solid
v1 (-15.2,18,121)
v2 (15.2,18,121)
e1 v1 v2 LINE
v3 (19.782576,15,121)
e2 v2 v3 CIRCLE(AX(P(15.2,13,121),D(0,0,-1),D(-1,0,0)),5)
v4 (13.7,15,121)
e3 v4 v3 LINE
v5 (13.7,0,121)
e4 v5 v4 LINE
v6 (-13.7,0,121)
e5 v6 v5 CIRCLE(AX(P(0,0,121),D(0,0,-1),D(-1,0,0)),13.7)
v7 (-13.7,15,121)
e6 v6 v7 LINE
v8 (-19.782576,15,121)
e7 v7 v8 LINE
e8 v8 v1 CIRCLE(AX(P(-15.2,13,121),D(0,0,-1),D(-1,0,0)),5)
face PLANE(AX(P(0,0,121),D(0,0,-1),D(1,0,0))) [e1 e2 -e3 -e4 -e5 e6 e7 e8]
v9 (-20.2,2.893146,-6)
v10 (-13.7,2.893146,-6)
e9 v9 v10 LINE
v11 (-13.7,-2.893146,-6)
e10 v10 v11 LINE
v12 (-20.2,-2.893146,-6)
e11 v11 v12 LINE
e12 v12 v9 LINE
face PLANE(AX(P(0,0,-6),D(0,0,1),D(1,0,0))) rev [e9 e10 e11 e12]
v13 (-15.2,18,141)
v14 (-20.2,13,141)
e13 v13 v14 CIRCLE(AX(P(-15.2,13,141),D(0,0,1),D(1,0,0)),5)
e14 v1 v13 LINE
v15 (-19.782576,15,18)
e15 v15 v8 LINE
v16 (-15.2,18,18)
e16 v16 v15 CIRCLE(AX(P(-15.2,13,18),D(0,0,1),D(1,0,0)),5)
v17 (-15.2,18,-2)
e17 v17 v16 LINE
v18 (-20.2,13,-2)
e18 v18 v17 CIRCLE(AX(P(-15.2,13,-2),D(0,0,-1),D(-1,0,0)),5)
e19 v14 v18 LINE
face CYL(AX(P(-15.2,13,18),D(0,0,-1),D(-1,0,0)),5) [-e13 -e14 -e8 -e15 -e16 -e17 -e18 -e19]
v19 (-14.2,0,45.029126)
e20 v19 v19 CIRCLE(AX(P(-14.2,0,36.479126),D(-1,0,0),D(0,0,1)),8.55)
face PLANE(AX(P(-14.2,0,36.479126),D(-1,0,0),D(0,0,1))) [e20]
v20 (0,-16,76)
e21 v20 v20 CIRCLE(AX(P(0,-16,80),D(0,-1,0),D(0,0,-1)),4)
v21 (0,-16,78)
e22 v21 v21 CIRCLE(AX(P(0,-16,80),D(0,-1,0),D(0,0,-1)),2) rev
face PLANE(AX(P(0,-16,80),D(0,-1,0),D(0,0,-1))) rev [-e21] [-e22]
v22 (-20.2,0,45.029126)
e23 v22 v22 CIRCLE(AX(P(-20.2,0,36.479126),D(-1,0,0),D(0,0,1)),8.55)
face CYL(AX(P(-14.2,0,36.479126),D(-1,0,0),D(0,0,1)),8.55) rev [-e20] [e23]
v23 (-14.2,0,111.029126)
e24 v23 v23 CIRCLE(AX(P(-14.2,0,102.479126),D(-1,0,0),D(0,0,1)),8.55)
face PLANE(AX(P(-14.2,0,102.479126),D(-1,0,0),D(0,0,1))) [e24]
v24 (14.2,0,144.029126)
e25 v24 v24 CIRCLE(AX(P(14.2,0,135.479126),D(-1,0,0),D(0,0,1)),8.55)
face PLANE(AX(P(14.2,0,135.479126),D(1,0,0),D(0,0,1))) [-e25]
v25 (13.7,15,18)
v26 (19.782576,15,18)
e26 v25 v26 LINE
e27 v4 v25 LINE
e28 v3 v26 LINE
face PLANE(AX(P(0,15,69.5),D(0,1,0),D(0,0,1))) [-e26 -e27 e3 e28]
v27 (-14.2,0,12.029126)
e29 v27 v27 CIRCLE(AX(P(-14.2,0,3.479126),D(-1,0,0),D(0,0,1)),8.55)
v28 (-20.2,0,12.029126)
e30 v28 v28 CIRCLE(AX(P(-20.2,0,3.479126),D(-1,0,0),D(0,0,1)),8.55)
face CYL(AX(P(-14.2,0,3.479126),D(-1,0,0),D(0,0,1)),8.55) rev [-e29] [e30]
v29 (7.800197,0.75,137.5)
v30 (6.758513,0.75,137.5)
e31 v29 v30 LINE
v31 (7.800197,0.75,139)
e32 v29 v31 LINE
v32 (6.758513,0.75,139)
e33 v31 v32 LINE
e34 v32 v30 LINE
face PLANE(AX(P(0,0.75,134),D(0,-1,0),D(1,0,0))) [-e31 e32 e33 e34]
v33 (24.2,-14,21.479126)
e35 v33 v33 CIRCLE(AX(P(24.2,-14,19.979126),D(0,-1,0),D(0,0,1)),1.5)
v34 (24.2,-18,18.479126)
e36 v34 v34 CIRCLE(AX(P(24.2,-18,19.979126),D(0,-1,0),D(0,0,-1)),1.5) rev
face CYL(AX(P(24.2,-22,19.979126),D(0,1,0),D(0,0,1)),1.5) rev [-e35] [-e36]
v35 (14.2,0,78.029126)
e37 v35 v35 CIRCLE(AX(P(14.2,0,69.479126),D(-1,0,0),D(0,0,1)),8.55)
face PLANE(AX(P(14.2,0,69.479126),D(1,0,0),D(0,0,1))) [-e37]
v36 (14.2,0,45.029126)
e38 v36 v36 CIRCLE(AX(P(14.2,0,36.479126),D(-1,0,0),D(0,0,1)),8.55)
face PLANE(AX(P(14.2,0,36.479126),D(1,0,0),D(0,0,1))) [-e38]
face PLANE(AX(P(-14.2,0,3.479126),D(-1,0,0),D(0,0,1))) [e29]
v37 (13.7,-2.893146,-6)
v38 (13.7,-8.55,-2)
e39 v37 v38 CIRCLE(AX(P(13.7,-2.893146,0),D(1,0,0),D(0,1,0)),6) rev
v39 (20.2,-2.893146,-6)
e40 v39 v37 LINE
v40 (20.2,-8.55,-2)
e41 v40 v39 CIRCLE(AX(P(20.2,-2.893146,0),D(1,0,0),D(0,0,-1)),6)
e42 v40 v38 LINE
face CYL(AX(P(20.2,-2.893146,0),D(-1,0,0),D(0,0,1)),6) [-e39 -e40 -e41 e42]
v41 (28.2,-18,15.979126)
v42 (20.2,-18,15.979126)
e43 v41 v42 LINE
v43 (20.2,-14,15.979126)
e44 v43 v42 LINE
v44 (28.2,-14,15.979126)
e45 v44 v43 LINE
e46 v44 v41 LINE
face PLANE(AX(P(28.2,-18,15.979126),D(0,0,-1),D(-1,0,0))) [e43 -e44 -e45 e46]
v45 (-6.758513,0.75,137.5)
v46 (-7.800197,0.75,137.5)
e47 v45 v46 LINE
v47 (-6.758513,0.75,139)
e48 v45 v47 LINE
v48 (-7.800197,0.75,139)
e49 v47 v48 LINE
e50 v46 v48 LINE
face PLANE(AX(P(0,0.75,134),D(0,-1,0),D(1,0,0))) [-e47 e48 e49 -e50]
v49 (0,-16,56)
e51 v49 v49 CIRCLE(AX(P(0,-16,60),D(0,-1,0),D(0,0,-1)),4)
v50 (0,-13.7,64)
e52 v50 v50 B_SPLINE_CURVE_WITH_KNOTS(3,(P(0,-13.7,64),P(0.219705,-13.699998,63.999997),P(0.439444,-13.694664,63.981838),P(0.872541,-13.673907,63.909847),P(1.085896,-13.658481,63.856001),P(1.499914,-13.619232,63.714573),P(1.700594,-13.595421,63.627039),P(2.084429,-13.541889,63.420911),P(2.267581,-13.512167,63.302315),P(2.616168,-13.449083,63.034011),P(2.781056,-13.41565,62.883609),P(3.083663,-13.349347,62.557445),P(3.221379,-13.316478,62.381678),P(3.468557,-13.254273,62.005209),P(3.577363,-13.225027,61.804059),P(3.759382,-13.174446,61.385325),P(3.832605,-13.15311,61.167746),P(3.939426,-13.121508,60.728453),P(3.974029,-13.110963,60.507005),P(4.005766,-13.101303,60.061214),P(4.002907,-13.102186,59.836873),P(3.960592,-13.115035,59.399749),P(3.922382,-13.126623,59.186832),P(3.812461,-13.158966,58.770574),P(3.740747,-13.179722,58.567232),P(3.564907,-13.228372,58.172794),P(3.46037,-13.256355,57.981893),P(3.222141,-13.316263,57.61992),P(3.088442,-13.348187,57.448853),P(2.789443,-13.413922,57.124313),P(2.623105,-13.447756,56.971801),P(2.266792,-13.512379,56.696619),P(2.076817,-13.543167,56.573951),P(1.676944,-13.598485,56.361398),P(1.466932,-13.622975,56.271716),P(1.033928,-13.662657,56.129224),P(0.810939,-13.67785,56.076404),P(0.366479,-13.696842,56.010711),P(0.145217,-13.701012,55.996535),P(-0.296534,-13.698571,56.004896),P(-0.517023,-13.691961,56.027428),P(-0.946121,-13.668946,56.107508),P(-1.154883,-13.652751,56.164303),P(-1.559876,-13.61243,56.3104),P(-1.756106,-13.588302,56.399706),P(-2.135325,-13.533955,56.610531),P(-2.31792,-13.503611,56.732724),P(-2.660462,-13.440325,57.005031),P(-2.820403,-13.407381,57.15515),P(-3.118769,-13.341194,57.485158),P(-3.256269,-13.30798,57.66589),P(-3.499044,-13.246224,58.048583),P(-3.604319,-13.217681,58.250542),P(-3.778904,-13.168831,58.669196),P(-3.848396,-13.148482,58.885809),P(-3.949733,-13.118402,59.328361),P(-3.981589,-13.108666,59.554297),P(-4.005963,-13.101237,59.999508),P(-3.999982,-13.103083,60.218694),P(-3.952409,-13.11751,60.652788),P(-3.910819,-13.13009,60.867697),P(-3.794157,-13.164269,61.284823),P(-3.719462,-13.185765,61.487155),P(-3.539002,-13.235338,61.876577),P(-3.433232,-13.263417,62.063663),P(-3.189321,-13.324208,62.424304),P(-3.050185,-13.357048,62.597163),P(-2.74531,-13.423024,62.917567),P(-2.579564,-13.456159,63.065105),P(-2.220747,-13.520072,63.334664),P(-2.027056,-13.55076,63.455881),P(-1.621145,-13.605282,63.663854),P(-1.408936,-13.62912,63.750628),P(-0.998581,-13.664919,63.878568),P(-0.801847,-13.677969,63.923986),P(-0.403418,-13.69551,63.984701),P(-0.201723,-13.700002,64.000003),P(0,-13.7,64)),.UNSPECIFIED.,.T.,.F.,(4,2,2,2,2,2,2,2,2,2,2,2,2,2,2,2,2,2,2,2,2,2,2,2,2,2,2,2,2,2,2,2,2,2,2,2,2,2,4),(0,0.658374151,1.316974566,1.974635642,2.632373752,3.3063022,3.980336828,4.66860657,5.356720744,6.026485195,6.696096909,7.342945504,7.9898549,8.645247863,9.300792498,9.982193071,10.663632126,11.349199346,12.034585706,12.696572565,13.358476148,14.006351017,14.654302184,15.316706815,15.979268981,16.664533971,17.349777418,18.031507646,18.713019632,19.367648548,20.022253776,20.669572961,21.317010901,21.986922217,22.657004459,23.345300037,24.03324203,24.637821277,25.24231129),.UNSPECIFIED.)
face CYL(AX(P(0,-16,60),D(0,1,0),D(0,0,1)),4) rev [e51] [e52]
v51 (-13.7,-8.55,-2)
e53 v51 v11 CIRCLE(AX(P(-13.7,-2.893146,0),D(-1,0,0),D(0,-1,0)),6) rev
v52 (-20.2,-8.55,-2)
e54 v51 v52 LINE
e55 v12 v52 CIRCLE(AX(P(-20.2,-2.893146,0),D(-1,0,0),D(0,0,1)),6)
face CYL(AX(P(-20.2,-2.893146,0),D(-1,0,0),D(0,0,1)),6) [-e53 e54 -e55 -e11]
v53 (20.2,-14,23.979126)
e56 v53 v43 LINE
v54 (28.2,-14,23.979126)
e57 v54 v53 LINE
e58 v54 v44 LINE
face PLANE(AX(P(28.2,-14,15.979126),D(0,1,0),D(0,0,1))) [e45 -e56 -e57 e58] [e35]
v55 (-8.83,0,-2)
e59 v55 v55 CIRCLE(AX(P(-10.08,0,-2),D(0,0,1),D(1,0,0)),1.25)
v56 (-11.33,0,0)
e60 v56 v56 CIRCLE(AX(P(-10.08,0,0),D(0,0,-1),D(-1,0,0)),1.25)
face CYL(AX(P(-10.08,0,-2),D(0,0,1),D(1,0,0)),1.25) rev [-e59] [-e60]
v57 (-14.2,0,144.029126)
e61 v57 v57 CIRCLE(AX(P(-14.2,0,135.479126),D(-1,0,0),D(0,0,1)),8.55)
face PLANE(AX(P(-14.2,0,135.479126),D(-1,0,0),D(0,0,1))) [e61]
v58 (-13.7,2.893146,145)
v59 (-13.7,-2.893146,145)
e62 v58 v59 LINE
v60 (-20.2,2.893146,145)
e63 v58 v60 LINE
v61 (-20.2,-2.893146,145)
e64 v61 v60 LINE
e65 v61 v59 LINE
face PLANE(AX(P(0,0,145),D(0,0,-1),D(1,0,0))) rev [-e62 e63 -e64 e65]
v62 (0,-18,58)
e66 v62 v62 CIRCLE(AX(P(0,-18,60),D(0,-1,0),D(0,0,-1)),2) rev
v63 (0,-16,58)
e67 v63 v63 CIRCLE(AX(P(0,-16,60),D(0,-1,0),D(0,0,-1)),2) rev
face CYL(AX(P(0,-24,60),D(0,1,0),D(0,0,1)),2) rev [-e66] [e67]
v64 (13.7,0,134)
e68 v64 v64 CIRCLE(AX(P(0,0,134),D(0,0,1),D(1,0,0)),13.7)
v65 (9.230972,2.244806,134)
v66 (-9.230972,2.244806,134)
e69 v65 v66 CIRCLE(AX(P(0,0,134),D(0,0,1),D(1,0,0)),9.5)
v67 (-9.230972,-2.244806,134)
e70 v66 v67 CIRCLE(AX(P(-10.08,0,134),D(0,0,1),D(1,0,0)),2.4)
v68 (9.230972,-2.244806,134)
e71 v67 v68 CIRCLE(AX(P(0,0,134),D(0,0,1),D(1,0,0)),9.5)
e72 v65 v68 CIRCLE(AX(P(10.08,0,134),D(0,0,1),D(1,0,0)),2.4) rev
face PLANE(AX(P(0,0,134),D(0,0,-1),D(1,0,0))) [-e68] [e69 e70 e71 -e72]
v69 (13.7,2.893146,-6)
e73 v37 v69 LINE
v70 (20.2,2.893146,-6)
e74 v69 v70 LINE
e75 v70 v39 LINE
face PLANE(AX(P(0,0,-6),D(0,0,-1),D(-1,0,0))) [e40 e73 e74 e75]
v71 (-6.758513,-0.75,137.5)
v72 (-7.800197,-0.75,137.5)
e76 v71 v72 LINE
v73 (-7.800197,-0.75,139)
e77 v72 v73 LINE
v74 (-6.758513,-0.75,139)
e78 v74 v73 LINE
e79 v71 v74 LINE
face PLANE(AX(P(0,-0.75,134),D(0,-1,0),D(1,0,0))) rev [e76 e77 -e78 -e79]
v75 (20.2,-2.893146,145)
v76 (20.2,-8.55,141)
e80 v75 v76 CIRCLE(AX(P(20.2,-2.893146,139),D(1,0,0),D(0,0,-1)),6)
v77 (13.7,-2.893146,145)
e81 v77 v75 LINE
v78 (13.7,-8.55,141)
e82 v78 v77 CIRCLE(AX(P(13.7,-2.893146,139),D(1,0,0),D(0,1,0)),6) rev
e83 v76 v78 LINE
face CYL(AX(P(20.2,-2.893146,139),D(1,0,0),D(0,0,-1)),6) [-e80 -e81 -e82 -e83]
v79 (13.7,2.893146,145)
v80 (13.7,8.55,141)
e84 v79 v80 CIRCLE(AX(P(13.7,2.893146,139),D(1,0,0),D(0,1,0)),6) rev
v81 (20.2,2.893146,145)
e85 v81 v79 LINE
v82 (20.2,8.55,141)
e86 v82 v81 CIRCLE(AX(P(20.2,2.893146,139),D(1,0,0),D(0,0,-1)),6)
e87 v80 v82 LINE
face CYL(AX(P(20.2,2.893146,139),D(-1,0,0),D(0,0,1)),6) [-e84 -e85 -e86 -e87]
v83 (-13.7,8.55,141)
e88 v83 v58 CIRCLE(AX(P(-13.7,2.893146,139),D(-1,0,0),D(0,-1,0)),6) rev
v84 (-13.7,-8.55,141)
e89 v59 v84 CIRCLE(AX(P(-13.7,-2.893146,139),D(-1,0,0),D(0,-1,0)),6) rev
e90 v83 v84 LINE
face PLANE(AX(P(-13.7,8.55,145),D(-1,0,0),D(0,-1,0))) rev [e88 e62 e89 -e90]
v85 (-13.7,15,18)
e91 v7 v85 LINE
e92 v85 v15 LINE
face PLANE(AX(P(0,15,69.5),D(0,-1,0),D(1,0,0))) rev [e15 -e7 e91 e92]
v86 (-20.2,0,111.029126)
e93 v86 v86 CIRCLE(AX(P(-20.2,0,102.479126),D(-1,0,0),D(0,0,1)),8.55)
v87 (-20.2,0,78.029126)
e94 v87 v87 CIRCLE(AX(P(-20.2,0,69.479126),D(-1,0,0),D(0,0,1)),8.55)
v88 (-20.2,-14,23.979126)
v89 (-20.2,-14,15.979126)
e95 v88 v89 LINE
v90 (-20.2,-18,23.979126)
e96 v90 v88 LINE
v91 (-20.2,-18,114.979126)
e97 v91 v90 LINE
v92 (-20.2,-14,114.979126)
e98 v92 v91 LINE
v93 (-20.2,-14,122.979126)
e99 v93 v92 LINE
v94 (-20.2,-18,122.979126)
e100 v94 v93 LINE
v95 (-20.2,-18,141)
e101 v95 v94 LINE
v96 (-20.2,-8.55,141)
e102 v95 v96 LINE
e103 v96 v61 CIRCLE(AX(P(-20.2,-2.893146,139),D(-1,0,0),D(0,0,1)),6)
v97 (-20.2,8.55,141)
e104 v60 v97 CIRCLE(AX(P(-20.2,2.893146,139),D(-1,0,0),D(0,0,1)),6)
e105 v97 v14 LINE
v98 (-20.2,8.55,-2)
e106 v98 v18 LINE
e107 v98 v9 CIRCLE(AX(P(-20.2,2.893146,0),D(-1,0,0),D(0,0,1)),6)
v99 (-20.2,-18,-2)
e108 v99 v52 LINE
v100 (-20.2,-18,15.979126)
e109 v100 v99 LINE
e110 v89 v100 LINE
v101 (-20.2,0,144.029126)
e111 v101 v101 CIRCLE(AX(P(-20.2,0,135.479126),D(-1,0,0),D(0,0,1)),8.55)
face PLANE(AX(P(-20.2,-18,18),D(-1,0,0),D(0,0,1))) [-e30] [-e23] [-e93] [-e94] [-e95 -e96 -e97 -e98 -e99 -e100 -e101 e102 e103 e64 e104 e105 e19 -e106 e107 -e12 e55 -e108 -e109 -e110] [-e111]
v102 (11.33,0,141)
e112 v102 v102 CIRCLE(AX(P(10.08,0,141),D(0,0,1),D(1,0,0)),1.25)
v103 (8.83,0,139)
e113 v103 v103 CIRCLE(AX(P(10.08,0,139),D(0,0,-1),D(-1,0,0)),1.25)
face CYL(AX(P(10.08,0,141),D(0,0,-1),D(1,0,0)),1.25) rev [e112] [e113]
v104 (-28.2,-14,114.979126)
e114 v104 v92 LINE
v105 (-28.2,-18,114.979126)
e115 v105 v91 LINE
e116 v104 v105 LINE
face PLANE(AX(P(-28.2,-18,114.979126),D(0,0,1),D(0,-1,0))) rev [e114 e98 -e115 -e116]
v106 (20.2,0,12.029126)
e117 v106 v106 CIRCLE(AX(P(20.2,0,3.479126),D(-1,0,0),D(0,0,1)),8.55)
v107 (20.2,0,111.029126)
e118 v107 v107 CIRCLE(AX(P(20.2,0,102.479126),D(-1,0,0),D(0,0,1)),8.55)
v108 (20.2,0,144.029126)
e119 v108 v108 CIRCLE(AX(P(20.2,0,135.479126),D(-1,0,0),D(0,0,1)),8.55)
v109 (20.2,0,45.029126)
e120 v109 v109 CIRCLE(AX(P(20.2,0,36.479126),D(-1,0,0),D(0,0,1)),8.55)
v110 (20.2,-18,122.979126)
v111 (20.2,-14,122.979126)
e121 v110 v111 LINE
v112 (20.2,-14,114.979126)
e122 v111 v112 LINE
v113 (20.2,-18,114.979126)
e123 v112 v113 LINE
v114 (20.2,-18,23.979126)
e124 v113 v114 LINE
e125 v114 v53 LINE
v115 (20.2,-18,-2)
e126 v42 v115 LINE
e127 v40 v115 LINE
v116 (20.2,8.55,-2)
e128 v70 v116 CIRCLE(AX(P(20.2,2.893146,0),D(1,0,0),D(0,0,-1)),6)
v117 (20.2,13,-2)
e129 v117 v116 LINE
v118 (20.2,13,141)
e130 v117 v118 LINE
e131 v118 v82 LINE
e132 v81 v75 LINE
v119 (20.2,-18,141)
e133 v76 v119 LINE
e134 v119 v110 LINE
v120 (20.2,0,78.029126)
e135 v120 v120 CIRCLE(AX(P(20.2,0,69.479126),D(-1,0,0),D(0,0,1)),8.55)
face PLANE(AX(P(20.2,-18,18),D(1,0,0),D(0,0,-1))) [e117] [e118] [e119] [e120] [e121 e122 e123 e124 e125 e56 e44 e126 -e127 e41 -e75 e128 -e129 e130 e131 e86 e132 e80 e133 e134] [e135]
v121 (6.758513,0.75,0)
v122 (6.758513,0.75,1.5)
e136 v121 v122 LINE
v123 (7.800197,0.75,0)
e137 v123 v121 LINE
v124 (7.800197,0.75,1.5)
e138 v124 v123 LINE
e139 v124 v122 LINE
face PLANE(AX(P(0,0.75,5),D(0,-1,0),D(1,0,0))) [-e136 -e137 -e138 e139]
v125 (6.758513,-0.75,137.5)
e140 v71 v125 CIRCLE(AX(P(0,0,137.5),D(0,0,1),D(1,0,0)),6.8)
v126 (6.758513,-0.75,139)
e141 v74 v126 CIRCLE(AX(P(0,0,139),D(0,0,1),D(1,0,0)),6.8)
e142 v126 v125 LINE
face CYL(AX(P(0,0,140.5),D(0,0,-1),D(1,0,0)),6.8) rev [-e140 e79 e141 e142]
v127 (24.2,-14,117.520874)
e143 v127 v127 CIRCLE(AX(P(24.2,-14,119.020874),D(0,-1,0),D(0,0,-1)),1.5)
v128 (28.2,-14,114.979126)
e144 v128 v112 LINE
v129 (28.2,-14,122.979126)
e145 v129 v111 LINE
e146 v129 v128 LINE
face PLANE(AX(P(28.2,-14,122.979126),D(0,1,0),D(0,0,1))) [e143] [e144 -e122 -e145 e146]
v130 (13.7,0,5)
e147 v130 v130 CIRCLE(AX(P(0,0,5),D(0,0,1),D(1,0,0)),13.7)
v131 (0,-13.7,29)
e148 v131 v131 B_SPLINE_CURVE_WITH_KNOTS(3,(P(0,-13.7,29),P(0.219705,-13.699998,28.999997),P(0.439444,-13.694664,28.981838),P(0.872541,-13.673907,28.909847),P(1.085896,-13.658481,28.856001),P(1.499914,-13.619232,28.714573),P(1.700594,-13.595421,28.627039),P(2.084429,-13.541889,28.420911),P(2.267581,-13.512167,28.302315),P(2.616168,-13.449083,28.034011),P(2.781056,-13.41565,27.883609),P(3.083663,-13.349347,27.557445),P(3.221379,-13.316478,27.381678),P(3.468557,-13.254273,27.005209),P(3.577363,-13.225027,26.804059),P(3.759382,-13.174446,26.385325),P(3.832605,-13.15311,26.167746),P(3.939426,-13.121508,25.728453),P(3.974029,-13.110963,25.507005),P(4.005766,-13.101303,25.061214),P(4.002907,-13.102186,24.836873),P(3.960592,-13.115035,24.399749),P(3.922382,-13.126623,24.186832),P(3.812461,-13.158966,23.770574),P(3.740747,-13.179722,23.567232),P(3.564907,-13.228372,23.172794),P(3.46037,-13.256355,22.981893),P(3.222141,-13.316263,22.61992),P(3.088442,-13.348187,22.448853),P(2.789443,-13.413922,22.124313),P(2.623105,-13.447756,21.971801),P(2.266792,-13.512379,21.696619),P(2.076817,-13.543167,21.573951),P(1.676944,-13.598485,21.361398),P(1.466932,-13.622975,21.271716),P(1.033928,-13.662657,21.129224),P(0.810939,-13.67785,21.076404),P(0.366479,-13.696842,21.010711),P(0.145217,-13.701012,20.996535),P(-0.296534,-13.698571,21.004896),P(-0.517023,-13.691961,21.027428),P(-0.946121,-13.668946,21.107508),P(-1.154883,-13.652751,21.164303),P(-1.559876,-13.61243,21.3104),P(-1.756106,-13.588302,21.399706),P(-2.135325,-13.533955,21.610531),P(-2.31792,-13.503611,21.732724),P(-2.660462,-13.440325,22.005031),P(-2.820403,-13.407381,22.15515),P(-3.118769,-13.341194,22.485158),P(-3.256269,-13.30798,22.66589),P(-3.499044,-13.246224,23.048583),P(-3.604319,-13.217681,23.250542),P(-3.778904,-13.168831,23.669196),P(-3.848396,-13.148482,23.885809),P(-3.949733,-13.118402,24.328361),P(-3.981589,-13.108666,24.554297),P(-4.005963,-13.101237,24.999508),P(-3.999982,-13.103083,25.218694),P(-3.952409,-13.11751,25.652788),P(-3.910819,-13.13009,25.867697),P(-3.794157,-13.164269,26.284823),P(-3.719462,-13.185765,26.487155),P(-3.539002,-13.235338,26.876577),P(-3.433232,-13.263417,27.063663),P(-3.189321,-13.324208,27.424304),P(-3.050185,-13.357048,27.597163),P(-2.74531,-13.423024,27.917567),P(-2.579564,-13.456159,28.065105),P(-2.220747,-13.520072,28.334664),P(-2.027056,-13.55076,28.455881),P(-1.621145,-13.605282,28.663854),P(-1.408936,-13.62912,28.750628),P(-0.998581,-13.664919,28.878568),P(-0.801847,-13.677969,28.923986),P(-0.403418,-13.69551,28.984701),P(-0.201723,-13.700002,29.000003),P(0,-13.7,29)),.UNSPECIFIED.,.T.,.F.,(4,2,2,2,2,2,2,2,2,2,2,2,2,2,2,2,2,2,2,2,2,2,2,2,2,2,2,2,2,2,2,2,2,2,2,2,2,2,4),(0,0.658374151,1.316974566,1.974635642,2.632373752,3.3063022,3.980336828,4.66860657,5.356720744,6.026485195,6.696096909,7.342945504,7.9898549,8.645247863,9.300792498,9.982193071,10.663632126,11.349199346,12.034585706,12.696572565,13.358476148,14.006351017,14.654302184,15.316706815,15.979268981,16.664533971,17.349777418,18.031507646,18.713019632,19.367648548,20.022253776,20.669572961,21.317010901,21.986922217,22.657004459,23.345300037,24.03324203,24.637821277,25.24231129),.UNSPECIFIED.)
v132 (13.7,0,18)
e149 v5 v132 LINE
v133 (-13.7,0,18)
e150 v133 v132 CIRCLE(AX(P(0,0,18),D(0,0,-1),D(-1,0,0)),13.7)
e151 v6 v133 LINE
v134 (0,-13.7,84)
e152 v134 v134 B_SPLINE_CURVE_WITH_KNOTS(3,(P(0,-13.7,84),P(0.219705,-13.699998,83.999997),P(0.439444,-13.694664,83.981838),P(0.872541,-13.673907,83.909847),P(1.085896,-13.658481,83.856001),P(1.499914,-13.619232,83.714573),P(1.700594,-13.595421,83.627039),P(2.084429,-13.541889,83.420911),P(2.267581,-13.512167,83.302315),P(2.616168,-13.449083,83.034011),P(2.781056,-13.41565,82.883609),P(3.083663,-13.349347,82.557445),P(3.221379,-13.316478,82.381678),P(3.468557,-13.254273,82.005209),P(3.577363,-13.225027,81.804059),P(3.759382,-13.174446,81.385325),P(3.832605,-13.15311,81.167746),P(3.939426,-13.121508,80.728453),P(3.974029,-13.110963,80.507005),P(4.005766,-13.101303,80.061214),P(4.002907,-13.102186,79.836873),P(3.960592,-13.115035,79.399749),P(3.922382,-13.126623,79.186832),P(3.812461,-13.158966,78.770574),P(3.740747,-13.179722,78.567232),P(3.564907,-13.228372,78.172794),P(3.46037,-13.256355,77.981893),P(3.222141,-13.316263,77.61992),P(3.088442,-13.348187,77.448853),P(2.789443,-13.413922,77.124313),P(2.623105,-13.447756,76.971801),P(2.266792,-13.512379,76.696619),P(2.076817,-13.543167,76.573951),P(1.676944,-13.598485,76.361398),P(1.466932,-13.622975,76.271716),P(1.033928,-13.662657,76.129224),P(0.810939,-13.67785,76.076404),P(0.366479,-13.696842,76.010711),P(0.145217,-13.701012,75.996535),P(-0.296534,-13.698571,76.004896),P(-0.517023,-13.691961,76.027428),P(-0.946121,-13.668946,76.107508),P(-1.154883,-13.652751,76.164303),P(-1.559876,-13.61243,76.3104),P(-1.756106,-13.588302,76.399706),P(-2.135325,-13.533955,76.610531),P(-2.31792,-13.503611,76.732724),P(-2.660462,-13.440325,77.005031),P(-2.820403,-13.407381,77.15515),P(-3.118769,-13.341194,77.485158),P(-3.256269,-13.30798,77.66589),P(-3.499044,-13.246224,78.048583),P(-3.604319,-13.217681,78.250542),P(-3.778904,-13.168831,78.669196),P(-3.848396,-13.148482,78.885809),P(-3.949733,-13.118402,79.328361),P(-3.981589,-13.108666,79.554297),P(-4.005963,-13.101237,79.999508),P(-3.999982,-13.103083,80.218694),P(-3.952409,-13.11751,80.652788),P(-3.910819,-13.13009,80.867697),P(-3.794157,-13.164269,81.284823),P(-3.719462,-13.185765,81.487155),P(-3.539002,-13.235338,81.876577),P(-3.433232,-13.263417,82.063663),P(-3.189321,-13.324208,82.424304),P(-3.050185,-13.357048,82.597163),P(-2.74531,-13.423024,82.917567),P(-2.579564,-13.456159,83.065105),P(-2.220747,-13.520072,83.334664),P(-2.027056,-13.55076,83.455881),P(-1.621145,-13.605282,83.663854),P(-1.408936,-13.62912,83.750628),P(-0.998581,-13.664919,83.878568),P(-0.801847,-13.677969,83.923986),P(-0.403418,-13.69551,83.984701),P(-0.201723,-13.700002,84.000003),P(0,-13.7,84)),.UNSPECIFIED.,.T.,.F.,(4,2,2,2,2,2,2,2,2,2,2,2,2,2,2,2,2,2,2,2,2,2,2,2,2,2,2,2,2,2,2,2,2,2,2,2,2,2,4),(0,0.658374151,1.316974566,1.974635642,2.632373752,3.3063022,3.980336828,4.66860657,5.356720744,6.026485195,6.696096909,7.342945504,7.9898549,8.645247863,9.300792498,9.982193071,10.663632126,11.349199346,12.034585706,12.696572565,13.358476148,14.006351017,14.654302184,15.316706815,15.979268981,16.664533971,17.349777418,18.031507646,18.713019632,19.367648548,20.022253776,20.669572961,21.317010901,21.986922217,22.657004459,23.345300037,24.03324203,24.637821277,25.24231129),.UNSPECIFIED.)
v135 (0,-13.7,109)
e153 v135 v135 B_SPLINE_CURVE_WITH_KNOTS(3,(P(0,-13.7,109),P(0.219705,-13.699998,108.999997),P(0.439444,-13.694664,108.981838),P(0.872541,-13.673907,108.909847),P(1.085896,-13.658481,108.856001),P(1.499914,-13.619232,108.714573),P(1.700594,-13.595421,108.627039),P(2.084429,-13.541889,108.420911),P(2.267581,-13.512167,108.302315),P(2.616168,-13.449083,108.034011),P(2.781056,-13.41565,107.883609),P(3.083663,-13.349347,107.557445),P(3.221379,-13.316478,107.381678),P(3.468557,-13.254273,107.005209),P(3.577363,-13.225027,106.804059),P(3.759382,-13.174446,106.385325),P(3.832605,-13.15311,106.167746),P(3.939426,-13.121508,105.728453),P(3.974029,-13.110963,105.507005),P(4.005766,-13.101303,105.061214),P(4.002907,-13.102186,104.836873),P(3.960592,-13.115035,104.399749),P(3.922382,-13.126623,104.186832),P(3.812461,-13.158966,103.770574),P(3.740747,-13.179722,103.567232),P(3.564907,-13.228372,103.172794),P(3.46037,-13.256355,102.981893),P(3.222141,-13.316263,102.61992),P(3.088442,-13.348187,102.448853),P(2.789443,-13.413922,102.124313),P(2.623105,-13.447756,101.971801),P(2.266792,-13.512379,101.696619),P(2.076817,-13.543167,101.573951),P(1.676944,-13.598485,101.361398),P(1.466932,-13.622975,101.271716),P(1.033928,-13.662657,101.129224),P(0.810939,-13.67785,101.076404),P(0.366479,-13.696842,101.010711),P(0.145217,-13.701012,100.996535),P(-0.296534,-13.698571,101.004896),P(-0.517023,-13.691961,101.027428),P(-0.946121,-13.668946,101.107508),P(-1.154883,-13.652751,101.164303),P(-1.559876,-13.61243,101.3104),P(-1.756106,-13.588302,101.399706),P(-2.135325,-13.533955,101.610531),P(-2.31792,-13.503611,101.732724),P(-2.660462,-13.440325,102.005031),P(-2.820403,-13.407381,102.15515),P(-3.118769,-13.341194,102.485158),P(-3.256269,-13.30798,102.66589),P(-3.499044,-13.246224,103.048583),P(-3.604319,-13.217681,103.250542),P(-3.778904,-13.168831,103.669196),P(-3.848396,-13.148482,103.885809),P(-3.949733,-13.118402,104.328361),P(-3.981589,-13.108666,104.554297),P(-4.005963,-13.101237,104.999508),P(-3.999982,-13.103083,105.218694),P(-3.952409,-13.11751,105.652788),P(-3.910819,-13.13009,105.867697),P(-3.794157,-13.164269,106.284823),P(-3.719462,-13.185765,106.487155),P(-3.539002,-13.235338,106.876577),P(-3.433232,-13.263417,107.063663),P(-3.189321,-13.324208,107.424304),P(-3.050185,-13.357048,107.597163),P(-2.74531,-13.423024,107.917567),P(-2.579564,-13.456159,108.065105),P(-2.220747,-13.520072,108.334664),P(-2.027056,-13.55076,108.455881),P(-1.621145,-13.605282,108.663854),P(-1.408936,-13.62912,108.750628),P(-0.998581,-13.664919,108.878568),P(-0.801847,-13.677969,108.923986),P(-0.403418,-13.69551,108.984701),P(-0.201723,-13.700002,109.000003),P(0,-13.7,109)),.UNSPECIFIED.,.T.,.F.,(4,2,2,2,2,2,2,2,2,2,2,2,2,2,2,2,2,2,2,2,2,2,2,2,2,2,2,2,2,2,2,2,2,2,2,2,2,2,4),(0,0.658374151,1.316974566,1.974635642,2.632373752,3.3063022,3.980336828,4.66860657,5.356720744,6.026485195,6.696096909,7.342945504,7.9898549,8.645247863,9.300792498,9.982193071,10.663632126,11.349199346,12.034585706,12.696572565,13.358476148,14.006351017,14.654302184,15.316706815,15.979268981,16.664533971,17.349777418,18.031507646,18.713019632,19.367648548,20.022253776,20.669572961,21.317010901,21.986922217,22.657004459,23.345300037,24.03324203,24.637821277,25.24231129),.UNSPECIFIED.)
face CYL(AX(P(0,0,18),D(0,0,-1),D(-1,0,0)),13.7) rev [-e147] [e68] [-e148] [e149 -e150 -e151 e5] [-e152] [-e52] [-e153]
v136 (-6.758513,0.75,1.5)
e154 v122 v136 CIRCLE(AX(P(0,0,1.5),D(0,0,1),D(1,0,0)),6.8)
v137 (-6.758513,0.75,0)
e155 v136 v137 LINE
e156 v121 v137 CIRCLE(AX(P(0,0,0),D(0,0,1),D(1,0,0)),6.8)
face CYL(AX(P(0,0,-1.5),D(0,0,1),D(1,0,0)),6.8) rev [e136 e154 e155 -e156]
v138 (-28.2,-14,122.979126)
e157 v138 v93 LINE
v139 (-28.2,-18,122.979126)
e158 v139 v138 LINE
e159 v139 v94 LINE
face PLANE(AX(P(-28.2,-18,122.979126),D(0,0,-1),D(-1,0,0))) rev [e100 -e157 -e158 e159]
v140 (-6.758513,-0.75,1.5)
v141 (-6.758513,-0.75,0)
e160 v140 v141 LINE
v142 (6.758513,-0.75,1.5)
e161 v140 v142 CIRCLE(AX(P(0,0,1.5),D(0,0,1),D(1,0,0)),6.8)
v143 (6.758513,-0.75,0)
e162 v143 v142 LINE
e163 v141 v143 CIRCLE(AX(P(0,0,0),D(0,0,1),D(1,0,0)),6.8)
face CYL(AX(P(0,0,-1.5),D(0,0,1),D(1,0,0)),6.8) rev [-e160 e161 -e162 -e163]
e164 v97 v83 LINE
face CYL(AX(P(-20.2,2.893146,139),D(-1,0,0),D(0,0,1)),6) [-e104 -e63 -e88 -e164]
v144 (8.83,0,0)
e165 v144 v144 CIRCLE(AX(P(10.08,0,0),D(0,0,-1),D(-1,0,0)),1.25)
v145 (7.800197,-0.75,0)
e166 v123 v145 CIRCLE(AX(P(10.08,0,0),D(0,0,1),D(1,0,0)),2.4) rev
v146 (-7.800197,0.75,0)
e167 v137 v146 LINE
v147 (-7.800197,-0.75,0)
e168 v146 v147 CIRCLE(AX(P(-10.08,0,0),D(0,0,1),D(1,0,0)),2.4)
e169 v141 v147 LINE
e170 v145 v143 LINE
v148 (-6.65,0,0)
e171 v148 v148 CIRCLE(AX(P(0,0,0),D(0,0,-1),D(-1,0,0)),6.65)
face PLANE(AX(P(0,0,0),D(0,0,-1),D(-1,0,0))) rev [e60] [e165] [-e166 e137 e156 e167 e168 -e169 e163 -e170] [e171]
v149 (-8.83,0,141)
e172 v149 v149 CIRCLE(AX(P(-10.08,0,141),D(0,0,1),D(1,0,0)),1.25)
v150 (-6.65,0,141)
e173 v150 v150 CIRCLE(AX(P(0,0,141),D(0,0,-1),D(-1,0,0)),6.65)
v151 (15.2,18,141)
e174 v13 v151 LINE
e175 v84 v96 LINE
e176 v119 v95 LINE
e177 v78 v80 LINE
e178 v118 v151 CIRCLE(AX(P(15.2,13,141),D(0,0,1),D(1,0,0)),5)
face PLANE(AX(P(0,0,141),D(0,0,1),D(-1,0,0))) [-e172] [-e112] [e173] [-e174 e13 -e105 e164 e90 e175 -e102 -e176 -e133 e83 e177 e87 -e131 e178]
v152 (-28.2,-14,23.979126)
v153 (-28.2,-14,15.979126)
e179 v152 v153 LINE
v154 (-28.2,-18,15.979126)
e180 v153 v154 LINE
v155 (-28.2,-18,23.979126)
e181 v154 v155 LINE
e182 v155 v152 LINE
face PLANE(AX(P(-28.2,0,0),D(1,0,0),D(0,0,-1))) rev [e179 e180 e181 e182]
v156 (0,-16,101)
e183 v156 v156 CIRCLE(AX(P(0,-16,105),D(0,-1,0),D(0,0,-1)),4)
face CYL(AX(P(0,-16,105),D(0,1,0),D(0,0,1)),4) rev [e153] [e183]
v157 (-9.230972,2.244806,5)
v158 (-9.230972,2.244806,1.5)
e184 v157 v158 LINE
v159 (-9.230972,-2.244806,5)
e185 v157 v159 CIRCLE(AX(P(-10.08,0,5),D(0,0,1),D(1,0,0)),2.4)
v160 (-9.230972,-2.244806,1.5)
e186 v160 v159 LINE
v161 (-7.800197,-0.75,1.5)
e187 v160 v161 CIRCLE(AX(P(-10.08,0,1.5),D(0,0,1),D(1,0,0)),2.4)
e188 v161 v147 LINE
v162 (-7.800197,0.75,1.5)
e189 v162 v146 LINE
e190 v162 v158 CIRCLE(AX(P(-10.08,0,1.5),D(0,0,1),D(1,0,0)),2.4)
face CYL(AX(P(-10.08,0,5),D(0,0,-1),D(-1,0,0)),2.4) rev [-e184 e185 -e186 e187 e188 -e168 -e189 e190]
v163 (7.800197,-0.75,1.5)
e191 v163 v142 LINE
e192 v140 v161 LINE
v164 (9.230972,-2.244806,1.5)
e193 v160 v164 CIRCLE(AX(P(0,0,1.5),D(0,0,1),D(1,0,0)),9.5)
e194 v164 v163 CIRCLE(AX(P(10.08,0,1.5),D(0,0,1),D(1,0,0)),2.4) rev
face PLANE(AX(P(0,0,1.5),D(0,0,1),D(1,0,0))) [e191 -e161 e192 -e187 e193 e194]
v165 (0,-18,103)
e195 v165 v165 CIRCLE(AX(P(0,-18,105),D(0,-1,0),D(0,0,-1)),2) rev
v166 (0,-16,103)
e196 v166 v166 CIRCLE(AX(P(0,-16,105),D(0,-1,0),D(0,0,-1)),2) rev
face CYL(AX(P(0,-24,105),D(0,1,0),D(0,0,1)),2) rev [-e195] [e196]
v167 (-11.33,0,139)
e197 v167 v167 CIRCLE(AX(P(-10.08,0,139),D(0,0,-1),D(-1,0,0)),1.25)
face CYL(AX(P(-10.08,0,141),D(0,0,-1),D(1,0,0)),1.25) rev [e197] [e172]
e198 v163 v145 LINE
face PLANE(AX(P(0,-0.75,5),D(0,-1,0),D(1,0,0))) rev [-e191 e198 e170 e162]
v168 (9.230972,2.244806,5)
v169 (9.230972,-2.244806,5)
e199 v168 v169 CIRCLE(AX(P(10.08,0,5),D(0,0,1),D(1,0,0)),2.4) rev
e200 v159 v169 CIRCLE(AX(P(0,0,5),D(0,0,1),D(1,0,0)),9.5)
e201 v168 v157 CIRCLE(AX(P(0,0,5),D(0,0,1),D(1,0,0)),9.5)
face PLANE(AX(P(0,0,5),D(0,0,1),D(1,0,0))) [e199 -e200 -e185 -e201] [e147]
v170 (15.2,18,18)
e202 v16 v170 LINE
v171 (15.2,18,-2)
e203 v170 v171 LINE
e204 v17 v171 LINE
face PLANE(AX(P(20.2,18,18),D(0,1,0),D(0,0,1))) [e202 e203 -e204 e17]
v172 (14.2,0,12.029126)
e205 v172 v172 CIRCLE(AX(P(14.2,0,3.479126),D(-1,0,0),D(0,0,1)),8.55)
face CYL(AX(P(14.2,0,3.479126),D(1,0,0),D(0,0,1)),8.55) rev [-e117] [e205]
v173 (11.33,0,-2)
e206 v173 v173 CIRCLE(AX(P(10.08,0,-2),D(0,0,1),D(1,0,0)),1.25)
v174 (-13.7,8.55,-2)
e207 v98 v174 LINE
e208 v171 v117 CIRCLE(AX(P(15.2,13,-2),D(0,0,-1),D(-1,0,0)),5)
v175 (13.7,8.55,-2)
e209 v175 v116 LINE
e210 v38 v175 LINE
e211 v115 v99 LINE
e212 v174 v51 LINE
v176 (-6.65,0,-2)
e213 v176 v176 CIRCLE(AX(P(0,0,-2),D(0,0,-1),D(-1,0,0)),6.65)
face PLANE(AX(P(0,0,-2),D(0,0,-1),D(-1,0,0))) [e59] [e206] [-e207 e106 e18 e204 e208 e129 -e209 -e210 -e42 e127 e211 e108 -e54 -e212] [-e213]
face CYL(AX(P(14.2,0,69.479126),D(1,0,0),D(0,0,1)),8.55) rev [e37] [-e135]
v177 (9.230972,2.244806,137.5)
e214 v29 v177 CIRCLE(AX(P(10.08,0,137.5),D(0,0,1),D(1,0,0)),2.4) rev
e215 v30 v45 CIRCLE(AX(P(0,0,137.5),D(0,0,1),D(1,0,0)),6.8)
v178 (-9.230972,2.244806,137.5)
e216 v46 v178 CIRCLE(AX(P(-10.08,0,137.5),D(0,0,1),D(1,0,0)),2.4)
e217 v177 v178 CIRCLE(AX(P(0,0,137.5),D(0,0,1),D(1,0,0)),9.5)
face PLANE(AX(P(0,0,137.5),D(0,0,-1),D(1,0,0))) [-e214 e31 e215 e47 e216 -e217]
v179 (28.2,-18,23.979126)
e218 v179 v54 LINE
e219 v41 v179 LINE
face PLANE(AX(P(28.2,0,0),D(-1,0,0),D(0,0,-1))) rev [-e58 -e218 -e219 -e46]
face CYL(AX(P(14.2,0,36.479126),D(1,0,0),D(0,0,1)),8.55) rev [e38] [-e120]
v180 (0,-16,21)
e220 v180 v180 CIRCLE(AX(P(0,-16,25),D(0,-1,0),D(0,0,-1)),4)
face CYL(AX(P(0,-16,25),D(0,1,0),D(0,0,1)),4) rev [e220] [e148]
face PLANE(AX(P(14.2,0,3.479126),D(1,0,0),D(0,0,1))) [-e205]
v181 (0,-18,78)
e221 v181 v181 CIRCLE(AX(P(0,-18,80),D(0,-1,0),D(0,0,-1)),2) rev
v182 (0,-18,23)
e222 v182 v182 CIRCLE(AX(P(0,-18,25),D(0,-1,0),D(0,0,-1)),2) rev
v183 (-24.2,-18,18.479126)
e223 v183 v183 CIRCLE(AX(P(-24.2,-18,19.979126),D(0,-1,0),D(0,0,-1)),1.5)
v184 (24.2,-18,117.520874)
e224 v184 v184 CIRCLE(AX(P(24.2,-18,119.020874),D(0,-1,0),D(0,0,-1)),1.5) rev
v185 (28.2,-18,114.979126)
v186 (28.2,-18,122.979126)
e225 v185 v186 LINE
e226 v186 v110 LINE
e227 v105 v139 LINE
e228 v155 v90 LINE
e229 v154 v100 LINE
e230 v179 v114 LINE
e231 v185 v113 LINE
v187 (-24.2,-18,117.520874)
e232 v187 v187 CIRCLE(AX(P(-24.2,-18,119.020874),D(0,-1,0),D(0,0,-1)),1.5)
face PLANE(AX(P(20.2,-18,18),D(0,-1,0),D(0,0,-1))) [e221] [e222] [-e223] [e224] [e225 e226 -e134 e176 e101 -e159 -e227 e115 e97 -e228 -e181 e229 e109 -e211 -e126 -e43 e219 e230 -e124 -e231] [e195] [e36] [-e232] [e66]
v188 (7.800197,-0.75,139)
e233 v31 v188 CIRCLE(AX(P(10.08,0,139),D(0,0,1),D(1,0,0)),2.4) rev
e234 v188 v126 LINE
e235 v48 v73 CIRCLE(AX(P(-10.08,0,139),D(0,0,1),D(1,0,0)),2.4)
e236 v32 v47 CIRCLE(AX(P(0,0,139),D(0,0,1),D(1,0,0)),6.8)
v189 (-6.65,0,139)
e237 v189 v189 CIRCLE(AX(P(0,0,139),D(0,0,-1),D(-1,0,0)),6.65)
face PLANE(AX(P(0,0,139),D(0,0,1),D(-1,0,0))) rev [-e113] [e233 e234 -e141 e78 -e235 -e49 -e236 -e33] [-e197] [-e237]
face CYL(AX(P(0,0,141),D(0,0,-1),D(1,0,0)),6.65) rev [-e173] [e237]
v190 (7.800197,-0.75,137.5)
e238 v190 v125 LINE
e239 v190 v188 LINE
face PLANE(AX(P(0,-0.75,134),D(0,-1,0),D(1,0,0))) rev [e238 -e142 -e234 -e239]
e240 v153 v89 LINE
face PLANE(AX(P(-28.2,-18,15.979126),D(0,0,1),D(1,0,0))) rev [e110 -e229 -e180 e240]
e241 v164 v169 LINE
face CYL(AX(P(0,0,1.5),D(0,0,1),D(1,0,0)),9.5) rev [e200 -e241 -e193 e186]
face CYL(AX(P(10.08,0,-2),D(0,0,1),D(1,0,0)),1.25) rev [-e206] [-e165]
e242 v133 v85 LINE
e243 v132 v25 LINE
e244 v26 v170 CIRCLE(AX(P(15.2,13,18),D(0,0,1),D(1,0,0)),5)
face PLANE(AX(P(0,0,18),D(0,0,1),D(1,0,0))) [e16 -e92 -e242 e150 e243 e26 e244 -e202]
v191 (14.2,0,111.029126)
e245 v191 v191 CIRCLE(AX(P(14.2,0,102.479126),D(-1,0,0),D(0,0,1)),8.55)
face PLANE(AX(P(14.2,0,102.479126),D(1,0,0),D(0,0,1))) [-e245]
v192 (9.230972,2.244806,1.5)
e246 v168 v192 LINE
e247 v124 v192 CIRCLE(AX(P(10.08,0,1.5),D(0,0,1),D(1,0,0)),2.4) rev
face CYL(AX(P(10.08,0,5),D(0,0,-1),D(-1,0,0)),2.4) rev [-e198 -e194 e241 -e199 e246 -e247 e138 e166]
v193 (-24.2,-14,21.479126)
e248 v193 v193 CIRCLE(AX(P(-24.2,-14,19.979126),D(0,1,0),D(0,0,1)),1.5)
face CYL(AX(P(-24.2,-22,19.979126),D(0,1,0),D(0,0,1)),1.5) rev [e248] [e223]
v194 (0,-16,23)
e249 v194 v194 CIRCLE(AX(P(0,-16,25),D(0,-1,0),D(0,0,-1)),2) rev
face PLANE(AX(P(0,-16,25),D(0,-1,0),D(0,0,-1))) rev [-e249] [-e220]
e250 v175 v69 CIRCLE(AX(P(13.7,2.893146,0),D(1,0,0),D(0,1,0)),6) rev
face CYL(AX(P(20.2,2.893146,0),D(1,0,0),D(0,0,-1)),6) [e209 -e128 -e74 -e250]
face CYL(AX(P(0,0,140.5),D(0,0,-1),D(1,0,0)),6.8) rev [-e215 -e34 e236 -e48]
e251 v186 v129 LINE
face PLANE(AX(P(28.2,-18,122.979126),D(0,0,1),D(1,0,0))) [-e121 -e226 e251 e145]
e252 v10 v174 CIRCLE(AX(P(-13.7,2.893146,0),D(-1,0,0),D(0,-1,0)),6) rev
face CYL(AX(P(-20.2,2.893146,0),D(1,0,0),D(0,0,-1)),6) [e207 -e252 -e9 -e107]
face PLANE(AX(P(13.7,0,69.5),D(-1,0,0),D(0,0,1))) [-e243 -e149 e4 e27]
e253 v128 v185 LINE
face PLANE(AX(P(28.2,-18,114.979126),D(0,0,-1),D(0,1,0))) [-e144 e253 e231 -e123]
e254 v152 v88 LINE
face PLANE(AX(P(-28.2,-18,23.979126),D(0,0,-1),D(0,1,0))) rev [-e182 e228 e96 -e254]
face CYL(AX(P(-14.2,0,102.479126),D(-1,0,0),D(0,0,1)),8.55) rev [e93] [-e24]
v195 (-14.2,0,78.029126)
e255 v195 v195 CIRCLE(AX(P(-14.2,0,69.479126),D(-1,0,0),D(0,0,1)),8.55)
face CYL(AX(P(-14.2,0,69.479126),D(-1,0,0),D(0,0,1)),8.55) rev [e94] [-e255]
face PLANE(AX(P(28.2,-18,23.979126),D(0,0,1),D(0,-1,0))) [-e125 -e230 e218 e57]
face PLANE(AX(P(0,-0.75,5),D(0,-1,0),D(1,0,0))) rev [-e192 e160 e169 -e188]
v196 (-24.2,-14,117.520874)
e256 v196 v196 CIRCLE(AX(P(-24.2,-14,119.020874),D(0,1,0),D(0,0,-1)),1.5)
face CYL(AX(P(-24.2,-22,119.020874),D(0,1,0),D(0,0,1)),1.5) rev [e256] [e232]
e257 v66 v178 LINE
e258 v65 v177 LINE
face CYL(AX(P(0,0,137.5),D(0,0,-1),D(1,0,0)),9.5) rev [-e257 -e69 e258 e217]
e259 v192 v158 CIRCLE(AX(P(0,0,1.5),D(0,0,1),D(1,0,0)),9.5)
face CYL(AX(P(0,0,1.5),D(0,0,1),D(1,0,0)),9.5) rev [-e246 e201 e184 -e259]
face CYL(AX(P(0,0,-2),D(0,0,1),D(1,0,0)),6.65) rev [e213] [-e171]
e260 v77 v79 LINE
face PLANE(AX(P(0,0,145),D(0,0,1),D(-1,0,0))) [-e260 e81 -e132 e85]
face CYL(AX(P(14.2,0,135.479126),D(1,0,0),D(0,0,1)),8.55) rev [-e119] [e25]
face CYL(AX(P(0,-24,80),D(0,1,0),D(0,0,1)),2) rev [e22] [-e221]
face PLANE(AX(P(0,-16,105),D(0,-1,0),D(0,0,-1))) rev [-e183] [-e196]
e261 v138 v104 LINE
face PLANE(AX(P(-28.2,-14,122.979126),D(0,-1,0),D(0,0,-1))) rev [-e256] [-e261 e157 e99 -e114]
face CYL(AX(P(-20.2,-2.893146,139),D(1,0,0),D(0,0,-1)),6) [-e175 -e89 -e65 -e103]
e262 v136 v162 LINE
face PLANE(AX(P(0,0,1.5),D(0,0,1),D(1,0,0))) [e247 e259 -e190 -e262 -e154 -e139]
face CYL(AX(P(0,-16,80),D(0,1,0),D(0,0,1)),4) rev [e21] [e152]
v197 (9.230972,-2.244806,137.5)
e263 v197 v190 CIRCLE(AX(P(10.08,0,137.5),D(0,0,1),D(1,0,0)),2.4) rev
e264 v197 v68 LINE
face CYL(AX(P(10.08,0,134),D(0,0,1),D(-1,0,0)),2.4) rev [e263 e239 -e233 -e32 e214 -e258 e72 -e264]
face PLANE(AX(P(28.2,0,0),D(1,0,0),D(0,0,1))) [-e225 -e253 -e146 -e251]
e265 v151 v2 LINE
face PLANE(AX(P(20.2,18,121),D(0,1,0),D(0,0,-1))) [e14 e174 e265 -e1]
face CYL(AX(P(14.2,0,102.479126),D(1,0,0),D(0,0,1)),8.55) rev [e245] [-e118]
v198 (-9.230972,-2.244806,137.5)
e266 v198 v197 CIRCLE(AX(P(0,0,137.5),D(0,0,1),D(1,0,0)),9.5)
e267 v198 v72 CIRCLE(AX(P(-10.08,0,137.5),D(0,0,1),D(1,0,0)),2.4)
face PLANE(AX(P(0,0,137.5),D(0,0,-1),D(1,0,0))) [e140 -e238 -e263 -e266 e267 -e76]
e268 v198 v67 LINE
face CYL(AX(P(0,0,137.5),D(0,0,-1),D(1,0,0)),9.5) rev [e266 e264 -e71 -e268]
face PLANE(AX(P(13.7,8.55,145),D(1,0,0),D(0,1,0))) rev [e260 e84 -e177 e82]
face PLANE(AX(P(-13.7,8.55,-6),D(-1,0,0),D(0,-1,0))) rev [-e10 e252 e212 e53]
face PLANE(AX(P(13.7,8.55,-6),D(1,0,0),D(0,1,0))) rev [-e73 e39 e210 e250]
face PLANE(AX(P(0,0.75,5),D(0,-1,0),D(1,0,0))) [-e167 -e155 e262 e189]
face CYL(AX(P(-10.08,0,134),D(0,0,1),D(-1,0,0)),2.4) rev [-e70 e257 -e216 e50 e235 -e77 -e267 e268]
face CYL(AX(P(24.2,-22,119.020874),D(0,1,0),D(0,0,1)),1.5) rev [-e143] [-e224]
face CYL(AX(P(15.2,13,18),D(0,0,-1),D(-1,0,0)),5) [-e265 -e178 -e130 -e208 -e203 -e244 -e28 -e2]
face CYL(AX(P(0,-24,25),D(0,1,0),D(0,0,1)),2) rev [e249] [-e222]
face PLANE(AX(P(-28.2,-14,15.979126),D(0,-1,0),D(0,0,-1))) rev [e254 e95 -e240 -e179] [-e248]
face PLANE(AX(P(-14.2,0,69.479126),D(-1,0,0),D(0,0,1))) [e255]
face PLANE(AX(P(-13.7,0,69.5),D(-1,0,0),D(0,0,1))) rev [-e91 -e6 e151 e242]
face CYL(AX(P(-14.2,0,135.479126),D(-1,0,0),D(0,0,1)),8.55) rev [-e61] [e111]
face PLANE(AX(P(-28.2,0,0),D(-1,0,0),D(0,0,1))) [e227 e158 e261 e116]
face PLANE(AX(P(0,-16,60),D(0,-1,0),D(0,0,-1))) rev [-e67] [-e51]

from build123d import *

# Parameters (mm, degrees)
CROQUIS1_R              = 13.7
SALIENTE_EXTRUIR1_DEPTH = 5
CROQUIS2_R              = 9.5
CORTAR_EXTRUIR1_DEPTH   = 3.5
CROQUIS3_R              = 6.8
CORTAR_EXTRUIR2_DEPTH   = 3
SALIENTE_EXTRUIR2_START = 2
CROQUIS4_R              = 13.7
CROQUIS4_R_2            = 6.65
SALIENTE_EXTRUIR2_DEPTH = 2
CROQUIS5_R              = 1.25
CORTAR_EXTRUIR3_DEPTH   = 21.600485431
CROQUIS6_W              = 40.4
CROQUIS6_H              = 36
CROQUIS6_R              = 13.7
SALIENTE_EXTRUIR3_DEPTH = 20
CROQUIS8_W              = 6.5
CROQUIS8_H              = 15
SALIENTE_EXTRUIR5_DEPTH = 51.5
CROQUIS11_W             = 6.5
CROQUIS11_H             = 17.1
SALIENTE_EXTRUIR6_DEPTH = 4
CROQUIS9_R              = 8.55
CORTAR_EXTRUIR4_DEPTH   = 6
REDONDEO1_R             = 5
REDONDEO2_R             = 5
CROQUIS10_R             = 4
CORTAR_EXTRUIR5_DEPTH   = 16
CROQUIS12_R             = 2
CORTAR_EXTRUIR6_DEPTH   = 24
REDONDEO4_R             = 6
REDONDEO5_R             = 6
CROQUIS13_W             = 8
CROQUIS13_H             = 4
SALIENTE_EXTRUIR7_DEPTH = 8
CROQUIS14_R             = 1.5
CORTAR_EXTRUIR7_DEPTH   = 8


with BuildPart() as part:
    # Croquis1 → Saliente-Extruir1 (new body)
    with BuildSketch(Plane.XY):
        Circle(CROQUIS1_R)
        with BuildLine():
            Line((0, 0.75), (7.800197377, 0.75))
            ThreePointArc((7.800197377, 0.75), (10.459785271, 2.369760146), (12.48, 0))
            ThreePointArc((12.48, 0), (10.459785271, -2.369760146), (7.800197377, -0.75))
            Line((7.800197377, -0.75), (0, -0.75))
            Line((0, -0.75), (-7.800197377, -0.75))
            ThreePointArc((-7.800197377, -0.75), (-12.48, 0), (-7.800197377, 0.75))
            Line((-7.800197377, 0.75), (0, 0.75))
        make_face(mode=Mode.SUBTRACT)
    extrude(amount=SALIENTE_EXTRUIR1_DEPTH)

    # Croquis2 → Cortar-Extruir1 (cut)
    with BuildSketch(Plane.XY.offset(5)):
        Circle(CROQUIS2_R)
    extrude(amount=-CORTAR_EXTRUIR1_DEPTH, mode=Mode.SUBTRACT)

    # Croquis3 → Cortar-Extruir2 (cut)
    with BuildSketch(Plane.XY.offset(1.5)):
        Circle(CROQUIS3_R)
    extrude(amount=-CORTAR_EXTRUIR2_DEPTH, mode=Mode.SUBTRACT)

    # Croquis4 → Saliente-Extruir2 (add)
    with BuildSketch(Plane(origin=(0, 0, 0), x_dir=(-1, 0, 0), z_dir=(0, 0, -1)).offset(SALIENTE_EXTRUIR2_START)):
        Circle(CROQUIS4_R)
        Circle(CROQUIS4_R_2, mode=Mode.SUBTRACT)
    extrude(amount=-SALIENTE_EXTRUIR2_DEPTH)

    # Croquis5 → Cortar-Extruir3 (cut, through all)
    with BuildSketch(Plane.XY.offset(5)):
        with Locations((-10.08, 0)):
            Circle(CROQUIS5_R)
        with Locations((10.08, 0)):
            Circle(CROQUIS5_R)
    extrude(amount=-CORTAR_EXTRUIR3_DEPTH, mode=Mode.SUBTRACT)



with BuildPart() as body_2:
    # Croquis6 → Saliente-Extruir3 (new body)
    with BuildSketch(Plane(origin=(0, 0, -2), x_dir=(-1, 0, 0), z_dir=(0, 0, -1))):
        Rectangle(CROQUIS6_W, CROQUIS6_H)
        Circle(CROQUIS6_R, mode=Mode.SUBTRACT)
    extrude(amount=-SALIENTE_EXTRUIR3_DEPTH)

    # Croquis8 → Saliente-Extruir5 (add)
    with BuildSketch(Plane.XY.offset(18)):
        with BuildLine():
            ThreePointArc((13.7, 0), (0, -13.7), (-13.7, 0))
            Line((-13.7, 0), (-20.2, 0))
            Line((-20.2, 0), (-20.2, -18))
            Line((-20.2, -18), (20.2, -18))
            Line((20.2, -18), (20.2, 0))
            Line((20.2, 0), (13.7, 0))
        make_face()
        with Locations((-16.95, 7.5)):
            Rectangle(CROQUIS8_W, CROQUIS8_H)
        with Locations((16.95, 7.5)):
            Rectangle(CROQUIS8_W, CROQUIS8_H)
    extrude(amount=SALIENTE_EXTRUIR5_DEPTH)


with BuildPart() as part_1:
    add(part.part)

    add(body_2.part)  # Saliente-Extruir6 merges body 2
    # Croquis11 → Saliente-Extruir6 (add)
    with BuildSketch(Plane(origin=(0, 0, -2), x_dir=(-1, 0, 0), z_dir=(0, 0, -1))):
        with Locations((-16.95, 0)):
            Rectangle(CROQUIS11_W, CROQUIS11_H)
        with Locations((16.95, 0)):
            Rectangle(CROQUIS11_W, CROQUIS11_H)
    extrude(amount=SALIENTE_EXTRUIR6_DEPTH)


with BuildPart() as body_2_2:
    # Simetría10: mirrored copy
    add(part_1.part.mirror(Plane.XY.offset(69.5)))


with BuildPart() as cortar_extruir4_tool:
    # Croquis9 → Cortar-Extruir4 (new body)
    with BuildSketch(Plane.ZY.offset(20.2)):
        with Locations((3.479126344, 0)):
            Circle(CROQUIS9_R)
        with Locations((36.479126344, 0)):
            Circle(CROQUIS9_R)
        with Locations((69.479126344, 0)):
            Circle(CROQUIS9_R)
        with Locations((102.479126344, 0)):
            Circle(CROQUIS9_R)
        with Locations((135.479126344, 0)):
            Circle(CROQUIS9_R)
    cortar_extruir4 = extrude(amount=-CORTAR_EXTRUIR4_DEPTH)


with BuildPart() as part_2:
    add(part_1.part)

    # Cortar-Extruir4: cut by cortar_extruir4_tool
    add(cortar_extruir4_tool.part, mode=Mode.SUBTRACT)


with BuildPart() as body_2_2_1:
    add(body_2_2.part)

    # Cortar-Extruir4: cut by cortar_extruir4_tool
    add(cortar_extruir4_tool.part, mode=Mode.SUBTRACT)


with BuildPart() as simetr_a11_tool:
    # Simetría11: Cortar-Extruir4 across plane
    add(cortar_extruir4.mirror(Plane(origin=(0, 0, 0), x_dir=(0, 0, 1), z_dir=(1, 0, 0))))


with BuildPart() as part_3:
    add(part_2.part)

    # Simetría11: cut by simetr_a11_tool
    add(simetr_a11_tool.part, mode=Mode.SUBTRACT)

    # Redondeo1
    redondeo1_edges = [part_3.edges().sort_by_distance(p)[0] for p in [
        (20.2, 18, 8),
        (-20.2, 18, 8),
    ]]
    fillet(redondeo1_edges, radius=REDONDEO1_R)


with BuildPart() as body_2_2_2:
    add(body_2_2_1.part)

    # Simetría11: cut by simetr_a11_tool
    add(simetr_a11_tool.part, mode=Mode.SUBTRACT)

    # Redondeo2
    redondeo2_edges = [body_2_2_2.edges().sort_by_distance(p)[0] for p in [
        (20.2, 18, 131),
        (-20.2, 18, 131),
    ]]
    fillet(redondeo2_edges, radius=REDONDEO2_R)


with BuildPart() as cortar_extruir5_tool:
    # Croquis10 → Cortar-Extruir5 (new body)
    with BuildSketch(Plane.XZ):
        with Locations(Location((0, 60, 0), (0, 0, 90))):
            Circle(CROQUIS10_R)
        with Locations(Location((0, 105, 0), (0, 0, 90))):
            Circle(CROQUIS10_R)
        with Locations(Location((0, 80, 0), (0, 0, 90))):
            Circle(CROQUIS10_R)
        with Locations(Location((0, 25, 0), (0, 0, 90))):
            Circle(CROQUIS10_R)
    extrude(amount=CORTAR_EXTRUIR5_DEPTH)


with BuildPart() as part_4:
    add(part_3.part)

    # Cortar-Extruir5: cut by cortar_extruir5_tool
    add(cortar_extruir5_tool.part, mode=Mode.SUBTRACT)


with BuildPart() as body_2_2_3:
    add(body_2_2_2.part)

    # Cortar-Extruir5: cut by cortar_extruir5_tool
    add(cortar_extruir5_tool.part, mode=Mode.SUBTRACT)


with BuildPart() as cortar_extruir6_tool:
    # Croquis12 → Cortar-Extruir6 (new body)
    with BuildSketch(Plane.XZ):
        with Locations(Location((0, 60, 0), (0, 0, 270))):
            Circle(CROQUIS12_R)
        with Locations(Location((0, 105, 0), (0, 0, 270))):
            Circle(CROQUIS12_R)
        with Locations(Location((0, 80, 0), (0, 0, 270))):
            Circle(CROQUIS12_R)
        with Locations(Location((0, 25, 0), (0, 0, 270))):
            Circle(CROQUIS12_R)
    extrude(amount=CORTAR_EXTRUIR6_DEPTH)


with BuildPart() as part_5:
    add(part_4.part)

    # Cortar-Extruir6: cut by cortar_extruir6_tool
    add(cortar_extruir6_tool.part, mode=Mode.SUBTRACT)

    # Redondeo5
    # the kernel refuses this fillet: 6 mm, written as the material it takes off along each edge
    with BuildSketch(Plane(origin=(-34.342135624, -8.55, -6), x_dir=(0, 0, 1), z_dir=(1, 0, 0)), Plane(origin=(0.442135624, 8.55, -6), x_dir=(0, 0, 1), z_dir=(-1, 0, 0)), Plane(origin=(34.342135624, 8.55, -6), x_dir=(0, 0, 1), z_dir=(-1, 0, 0))) as redondeo5_piece_1:
        with BuildLine():
            CenterArc((6, -5.656854249), REDONDEO5_R, 109.471220634, 70.528779366)
            Line((0, -5.656854249), (-0.12, -5.656854249))
            Line((-0.12, -5.656854249), (-0.12, 0))
            Line((-0.12, 0), (0, 0.12))
            ThreePointArc((0, 0.12), (2, 0.12), (3.96, 0.113137085))
            Line((3.96, 0.113137085), (4, 0))
        make_face()
    extrude(amount=34.784271247, mode=Mode.SUBTRACT)
    with BuildSketch(Plane(origin=(-0.442135624, -8.55, -6), x_dir=(0, 1, 0), z_dir=(1, 0, 0))) as redondeo5_piece_2:
        with BuildLine():
            CenterArc((5.656854249, 6), REDONDEO5_R, 199.471220634, 70.528779366)
            Line((0, 4), (-0.113137085, 3.96))
            ThreePointArc((-0.113137085, 3.96), (-0.12, 2), (-0.12, 0))
            Line((-0.12, 0), (0, -0.12))
            Line((0, -0.12), (5.656854249, -0.12))
            Line((5.656854249, -0.12), (5.656854249, 0))
        make_face()
    extrude(amount=34.784271247, mode=Mode.SUBTRACT)



with BuildPart() as body_2_2_4:
    add(body_2_2_3.part)

    # Cortar-Extruir6: cut by cortar_extruir6_tool
    add(cortar_extruir6_tool.part, mode=Mode.SUBTRACT)

    # Redondeo4
    # the kernel refuses this fillet: 6 mm, written as the material it takes off along each edge
    with BuildSketch(Plane(origin=(-34.342135624, -8.55, 145), x_dir=(0, 0, -1), z_dir=(1, 0, 0)), Plane(origin=(0.442135624, 8.55, 145), x_dir=(0, 0, -1), z_dir=(-1, 0, 0)), Plane(origin=(-0.442135624, -8.55, 145), x_dir=(0, 0, -1), z_dir=(1, 0, 0)), Plane(origin=(34.342135624, 8.55, 145), x_dir=(0, 0, -1), z_dir=(-1, 0, 0))) as redondeo4_piece_1:
        with BuildLine():
            CenterArc((6, 5.656854249), REDONDEO4_R, 180, 70.528779366)
            Line((0, 5.656854249), (-0.12, 5.656854249))
            Line((-0.12, 5.656854249), (-0.12, 0))
            Line((-0.12, 0), (0, -0.12))
            ThreePointArc((0, -0.12), (2, -0.12), (3.96, -0.113137085))
            Line((3.96, -0.113137085), (4, 0))
        make_face()
    extrude(amount=34.784271247, mode=Mode.SUBTRACT)


with BuildPart() as part_6:
    add(part_5.part)

    add(body_2_2_4.part)  # Saliente-Extruir7 merges body 2 2
    # Croquis13 → Saliente-Extruir7 (add)
    with BuildSketch(Plane.ZY.offset(20.2)):
        with Locations((19.979126344, -16)):
            Rectangle(CROQUIS13_W, CROQUIS13_H)
        with Locations((118.979126344, -16)):
            Rectangle(CROQUIS13_W, CROQUIS13_H)
    saliente_extruir7 = extrude(amount=SALIENTE_EXTRUIR7_DEPTH)

    # Croquis14 → Cortar-Extruir7 (cut)
    with BuildSketch(Plane(origin=(0, -14, 0), x_dir=(1, 0, 0), z_dir=(0, 1, 0))):
        with Locations(Location((-24.2, -19.979126344, 0), (0, 0, 270))):
            Circle(CROQUIS14_R)
        with Locations(Location((-24.2, -119.020873656, 0), (0, 0, 90))):
            Circle(CROQUIS14_R)
    cortar_extruir7 = extrude(amount=-CORTAR_EXTRUIR7_DEPTH, mode=Mode.SUBTRACT)

    # Simetría12: Saliente-Extruir7, Cortar-Extruir7 across plane
    add(saliente_extruir7.mirror(Plane(origin=(0, 0, 0), x_dir=(0, 0, 1), z_dir=(1, 0, 0))))
    add(cortar_extruir7.mirror(Plane(origin=(0, 0, 0), x_dir=(0, 0, 1), z_dir=(1, 0, 0))), mode=Mode.SUBTRACT)


solid = part_6.part
